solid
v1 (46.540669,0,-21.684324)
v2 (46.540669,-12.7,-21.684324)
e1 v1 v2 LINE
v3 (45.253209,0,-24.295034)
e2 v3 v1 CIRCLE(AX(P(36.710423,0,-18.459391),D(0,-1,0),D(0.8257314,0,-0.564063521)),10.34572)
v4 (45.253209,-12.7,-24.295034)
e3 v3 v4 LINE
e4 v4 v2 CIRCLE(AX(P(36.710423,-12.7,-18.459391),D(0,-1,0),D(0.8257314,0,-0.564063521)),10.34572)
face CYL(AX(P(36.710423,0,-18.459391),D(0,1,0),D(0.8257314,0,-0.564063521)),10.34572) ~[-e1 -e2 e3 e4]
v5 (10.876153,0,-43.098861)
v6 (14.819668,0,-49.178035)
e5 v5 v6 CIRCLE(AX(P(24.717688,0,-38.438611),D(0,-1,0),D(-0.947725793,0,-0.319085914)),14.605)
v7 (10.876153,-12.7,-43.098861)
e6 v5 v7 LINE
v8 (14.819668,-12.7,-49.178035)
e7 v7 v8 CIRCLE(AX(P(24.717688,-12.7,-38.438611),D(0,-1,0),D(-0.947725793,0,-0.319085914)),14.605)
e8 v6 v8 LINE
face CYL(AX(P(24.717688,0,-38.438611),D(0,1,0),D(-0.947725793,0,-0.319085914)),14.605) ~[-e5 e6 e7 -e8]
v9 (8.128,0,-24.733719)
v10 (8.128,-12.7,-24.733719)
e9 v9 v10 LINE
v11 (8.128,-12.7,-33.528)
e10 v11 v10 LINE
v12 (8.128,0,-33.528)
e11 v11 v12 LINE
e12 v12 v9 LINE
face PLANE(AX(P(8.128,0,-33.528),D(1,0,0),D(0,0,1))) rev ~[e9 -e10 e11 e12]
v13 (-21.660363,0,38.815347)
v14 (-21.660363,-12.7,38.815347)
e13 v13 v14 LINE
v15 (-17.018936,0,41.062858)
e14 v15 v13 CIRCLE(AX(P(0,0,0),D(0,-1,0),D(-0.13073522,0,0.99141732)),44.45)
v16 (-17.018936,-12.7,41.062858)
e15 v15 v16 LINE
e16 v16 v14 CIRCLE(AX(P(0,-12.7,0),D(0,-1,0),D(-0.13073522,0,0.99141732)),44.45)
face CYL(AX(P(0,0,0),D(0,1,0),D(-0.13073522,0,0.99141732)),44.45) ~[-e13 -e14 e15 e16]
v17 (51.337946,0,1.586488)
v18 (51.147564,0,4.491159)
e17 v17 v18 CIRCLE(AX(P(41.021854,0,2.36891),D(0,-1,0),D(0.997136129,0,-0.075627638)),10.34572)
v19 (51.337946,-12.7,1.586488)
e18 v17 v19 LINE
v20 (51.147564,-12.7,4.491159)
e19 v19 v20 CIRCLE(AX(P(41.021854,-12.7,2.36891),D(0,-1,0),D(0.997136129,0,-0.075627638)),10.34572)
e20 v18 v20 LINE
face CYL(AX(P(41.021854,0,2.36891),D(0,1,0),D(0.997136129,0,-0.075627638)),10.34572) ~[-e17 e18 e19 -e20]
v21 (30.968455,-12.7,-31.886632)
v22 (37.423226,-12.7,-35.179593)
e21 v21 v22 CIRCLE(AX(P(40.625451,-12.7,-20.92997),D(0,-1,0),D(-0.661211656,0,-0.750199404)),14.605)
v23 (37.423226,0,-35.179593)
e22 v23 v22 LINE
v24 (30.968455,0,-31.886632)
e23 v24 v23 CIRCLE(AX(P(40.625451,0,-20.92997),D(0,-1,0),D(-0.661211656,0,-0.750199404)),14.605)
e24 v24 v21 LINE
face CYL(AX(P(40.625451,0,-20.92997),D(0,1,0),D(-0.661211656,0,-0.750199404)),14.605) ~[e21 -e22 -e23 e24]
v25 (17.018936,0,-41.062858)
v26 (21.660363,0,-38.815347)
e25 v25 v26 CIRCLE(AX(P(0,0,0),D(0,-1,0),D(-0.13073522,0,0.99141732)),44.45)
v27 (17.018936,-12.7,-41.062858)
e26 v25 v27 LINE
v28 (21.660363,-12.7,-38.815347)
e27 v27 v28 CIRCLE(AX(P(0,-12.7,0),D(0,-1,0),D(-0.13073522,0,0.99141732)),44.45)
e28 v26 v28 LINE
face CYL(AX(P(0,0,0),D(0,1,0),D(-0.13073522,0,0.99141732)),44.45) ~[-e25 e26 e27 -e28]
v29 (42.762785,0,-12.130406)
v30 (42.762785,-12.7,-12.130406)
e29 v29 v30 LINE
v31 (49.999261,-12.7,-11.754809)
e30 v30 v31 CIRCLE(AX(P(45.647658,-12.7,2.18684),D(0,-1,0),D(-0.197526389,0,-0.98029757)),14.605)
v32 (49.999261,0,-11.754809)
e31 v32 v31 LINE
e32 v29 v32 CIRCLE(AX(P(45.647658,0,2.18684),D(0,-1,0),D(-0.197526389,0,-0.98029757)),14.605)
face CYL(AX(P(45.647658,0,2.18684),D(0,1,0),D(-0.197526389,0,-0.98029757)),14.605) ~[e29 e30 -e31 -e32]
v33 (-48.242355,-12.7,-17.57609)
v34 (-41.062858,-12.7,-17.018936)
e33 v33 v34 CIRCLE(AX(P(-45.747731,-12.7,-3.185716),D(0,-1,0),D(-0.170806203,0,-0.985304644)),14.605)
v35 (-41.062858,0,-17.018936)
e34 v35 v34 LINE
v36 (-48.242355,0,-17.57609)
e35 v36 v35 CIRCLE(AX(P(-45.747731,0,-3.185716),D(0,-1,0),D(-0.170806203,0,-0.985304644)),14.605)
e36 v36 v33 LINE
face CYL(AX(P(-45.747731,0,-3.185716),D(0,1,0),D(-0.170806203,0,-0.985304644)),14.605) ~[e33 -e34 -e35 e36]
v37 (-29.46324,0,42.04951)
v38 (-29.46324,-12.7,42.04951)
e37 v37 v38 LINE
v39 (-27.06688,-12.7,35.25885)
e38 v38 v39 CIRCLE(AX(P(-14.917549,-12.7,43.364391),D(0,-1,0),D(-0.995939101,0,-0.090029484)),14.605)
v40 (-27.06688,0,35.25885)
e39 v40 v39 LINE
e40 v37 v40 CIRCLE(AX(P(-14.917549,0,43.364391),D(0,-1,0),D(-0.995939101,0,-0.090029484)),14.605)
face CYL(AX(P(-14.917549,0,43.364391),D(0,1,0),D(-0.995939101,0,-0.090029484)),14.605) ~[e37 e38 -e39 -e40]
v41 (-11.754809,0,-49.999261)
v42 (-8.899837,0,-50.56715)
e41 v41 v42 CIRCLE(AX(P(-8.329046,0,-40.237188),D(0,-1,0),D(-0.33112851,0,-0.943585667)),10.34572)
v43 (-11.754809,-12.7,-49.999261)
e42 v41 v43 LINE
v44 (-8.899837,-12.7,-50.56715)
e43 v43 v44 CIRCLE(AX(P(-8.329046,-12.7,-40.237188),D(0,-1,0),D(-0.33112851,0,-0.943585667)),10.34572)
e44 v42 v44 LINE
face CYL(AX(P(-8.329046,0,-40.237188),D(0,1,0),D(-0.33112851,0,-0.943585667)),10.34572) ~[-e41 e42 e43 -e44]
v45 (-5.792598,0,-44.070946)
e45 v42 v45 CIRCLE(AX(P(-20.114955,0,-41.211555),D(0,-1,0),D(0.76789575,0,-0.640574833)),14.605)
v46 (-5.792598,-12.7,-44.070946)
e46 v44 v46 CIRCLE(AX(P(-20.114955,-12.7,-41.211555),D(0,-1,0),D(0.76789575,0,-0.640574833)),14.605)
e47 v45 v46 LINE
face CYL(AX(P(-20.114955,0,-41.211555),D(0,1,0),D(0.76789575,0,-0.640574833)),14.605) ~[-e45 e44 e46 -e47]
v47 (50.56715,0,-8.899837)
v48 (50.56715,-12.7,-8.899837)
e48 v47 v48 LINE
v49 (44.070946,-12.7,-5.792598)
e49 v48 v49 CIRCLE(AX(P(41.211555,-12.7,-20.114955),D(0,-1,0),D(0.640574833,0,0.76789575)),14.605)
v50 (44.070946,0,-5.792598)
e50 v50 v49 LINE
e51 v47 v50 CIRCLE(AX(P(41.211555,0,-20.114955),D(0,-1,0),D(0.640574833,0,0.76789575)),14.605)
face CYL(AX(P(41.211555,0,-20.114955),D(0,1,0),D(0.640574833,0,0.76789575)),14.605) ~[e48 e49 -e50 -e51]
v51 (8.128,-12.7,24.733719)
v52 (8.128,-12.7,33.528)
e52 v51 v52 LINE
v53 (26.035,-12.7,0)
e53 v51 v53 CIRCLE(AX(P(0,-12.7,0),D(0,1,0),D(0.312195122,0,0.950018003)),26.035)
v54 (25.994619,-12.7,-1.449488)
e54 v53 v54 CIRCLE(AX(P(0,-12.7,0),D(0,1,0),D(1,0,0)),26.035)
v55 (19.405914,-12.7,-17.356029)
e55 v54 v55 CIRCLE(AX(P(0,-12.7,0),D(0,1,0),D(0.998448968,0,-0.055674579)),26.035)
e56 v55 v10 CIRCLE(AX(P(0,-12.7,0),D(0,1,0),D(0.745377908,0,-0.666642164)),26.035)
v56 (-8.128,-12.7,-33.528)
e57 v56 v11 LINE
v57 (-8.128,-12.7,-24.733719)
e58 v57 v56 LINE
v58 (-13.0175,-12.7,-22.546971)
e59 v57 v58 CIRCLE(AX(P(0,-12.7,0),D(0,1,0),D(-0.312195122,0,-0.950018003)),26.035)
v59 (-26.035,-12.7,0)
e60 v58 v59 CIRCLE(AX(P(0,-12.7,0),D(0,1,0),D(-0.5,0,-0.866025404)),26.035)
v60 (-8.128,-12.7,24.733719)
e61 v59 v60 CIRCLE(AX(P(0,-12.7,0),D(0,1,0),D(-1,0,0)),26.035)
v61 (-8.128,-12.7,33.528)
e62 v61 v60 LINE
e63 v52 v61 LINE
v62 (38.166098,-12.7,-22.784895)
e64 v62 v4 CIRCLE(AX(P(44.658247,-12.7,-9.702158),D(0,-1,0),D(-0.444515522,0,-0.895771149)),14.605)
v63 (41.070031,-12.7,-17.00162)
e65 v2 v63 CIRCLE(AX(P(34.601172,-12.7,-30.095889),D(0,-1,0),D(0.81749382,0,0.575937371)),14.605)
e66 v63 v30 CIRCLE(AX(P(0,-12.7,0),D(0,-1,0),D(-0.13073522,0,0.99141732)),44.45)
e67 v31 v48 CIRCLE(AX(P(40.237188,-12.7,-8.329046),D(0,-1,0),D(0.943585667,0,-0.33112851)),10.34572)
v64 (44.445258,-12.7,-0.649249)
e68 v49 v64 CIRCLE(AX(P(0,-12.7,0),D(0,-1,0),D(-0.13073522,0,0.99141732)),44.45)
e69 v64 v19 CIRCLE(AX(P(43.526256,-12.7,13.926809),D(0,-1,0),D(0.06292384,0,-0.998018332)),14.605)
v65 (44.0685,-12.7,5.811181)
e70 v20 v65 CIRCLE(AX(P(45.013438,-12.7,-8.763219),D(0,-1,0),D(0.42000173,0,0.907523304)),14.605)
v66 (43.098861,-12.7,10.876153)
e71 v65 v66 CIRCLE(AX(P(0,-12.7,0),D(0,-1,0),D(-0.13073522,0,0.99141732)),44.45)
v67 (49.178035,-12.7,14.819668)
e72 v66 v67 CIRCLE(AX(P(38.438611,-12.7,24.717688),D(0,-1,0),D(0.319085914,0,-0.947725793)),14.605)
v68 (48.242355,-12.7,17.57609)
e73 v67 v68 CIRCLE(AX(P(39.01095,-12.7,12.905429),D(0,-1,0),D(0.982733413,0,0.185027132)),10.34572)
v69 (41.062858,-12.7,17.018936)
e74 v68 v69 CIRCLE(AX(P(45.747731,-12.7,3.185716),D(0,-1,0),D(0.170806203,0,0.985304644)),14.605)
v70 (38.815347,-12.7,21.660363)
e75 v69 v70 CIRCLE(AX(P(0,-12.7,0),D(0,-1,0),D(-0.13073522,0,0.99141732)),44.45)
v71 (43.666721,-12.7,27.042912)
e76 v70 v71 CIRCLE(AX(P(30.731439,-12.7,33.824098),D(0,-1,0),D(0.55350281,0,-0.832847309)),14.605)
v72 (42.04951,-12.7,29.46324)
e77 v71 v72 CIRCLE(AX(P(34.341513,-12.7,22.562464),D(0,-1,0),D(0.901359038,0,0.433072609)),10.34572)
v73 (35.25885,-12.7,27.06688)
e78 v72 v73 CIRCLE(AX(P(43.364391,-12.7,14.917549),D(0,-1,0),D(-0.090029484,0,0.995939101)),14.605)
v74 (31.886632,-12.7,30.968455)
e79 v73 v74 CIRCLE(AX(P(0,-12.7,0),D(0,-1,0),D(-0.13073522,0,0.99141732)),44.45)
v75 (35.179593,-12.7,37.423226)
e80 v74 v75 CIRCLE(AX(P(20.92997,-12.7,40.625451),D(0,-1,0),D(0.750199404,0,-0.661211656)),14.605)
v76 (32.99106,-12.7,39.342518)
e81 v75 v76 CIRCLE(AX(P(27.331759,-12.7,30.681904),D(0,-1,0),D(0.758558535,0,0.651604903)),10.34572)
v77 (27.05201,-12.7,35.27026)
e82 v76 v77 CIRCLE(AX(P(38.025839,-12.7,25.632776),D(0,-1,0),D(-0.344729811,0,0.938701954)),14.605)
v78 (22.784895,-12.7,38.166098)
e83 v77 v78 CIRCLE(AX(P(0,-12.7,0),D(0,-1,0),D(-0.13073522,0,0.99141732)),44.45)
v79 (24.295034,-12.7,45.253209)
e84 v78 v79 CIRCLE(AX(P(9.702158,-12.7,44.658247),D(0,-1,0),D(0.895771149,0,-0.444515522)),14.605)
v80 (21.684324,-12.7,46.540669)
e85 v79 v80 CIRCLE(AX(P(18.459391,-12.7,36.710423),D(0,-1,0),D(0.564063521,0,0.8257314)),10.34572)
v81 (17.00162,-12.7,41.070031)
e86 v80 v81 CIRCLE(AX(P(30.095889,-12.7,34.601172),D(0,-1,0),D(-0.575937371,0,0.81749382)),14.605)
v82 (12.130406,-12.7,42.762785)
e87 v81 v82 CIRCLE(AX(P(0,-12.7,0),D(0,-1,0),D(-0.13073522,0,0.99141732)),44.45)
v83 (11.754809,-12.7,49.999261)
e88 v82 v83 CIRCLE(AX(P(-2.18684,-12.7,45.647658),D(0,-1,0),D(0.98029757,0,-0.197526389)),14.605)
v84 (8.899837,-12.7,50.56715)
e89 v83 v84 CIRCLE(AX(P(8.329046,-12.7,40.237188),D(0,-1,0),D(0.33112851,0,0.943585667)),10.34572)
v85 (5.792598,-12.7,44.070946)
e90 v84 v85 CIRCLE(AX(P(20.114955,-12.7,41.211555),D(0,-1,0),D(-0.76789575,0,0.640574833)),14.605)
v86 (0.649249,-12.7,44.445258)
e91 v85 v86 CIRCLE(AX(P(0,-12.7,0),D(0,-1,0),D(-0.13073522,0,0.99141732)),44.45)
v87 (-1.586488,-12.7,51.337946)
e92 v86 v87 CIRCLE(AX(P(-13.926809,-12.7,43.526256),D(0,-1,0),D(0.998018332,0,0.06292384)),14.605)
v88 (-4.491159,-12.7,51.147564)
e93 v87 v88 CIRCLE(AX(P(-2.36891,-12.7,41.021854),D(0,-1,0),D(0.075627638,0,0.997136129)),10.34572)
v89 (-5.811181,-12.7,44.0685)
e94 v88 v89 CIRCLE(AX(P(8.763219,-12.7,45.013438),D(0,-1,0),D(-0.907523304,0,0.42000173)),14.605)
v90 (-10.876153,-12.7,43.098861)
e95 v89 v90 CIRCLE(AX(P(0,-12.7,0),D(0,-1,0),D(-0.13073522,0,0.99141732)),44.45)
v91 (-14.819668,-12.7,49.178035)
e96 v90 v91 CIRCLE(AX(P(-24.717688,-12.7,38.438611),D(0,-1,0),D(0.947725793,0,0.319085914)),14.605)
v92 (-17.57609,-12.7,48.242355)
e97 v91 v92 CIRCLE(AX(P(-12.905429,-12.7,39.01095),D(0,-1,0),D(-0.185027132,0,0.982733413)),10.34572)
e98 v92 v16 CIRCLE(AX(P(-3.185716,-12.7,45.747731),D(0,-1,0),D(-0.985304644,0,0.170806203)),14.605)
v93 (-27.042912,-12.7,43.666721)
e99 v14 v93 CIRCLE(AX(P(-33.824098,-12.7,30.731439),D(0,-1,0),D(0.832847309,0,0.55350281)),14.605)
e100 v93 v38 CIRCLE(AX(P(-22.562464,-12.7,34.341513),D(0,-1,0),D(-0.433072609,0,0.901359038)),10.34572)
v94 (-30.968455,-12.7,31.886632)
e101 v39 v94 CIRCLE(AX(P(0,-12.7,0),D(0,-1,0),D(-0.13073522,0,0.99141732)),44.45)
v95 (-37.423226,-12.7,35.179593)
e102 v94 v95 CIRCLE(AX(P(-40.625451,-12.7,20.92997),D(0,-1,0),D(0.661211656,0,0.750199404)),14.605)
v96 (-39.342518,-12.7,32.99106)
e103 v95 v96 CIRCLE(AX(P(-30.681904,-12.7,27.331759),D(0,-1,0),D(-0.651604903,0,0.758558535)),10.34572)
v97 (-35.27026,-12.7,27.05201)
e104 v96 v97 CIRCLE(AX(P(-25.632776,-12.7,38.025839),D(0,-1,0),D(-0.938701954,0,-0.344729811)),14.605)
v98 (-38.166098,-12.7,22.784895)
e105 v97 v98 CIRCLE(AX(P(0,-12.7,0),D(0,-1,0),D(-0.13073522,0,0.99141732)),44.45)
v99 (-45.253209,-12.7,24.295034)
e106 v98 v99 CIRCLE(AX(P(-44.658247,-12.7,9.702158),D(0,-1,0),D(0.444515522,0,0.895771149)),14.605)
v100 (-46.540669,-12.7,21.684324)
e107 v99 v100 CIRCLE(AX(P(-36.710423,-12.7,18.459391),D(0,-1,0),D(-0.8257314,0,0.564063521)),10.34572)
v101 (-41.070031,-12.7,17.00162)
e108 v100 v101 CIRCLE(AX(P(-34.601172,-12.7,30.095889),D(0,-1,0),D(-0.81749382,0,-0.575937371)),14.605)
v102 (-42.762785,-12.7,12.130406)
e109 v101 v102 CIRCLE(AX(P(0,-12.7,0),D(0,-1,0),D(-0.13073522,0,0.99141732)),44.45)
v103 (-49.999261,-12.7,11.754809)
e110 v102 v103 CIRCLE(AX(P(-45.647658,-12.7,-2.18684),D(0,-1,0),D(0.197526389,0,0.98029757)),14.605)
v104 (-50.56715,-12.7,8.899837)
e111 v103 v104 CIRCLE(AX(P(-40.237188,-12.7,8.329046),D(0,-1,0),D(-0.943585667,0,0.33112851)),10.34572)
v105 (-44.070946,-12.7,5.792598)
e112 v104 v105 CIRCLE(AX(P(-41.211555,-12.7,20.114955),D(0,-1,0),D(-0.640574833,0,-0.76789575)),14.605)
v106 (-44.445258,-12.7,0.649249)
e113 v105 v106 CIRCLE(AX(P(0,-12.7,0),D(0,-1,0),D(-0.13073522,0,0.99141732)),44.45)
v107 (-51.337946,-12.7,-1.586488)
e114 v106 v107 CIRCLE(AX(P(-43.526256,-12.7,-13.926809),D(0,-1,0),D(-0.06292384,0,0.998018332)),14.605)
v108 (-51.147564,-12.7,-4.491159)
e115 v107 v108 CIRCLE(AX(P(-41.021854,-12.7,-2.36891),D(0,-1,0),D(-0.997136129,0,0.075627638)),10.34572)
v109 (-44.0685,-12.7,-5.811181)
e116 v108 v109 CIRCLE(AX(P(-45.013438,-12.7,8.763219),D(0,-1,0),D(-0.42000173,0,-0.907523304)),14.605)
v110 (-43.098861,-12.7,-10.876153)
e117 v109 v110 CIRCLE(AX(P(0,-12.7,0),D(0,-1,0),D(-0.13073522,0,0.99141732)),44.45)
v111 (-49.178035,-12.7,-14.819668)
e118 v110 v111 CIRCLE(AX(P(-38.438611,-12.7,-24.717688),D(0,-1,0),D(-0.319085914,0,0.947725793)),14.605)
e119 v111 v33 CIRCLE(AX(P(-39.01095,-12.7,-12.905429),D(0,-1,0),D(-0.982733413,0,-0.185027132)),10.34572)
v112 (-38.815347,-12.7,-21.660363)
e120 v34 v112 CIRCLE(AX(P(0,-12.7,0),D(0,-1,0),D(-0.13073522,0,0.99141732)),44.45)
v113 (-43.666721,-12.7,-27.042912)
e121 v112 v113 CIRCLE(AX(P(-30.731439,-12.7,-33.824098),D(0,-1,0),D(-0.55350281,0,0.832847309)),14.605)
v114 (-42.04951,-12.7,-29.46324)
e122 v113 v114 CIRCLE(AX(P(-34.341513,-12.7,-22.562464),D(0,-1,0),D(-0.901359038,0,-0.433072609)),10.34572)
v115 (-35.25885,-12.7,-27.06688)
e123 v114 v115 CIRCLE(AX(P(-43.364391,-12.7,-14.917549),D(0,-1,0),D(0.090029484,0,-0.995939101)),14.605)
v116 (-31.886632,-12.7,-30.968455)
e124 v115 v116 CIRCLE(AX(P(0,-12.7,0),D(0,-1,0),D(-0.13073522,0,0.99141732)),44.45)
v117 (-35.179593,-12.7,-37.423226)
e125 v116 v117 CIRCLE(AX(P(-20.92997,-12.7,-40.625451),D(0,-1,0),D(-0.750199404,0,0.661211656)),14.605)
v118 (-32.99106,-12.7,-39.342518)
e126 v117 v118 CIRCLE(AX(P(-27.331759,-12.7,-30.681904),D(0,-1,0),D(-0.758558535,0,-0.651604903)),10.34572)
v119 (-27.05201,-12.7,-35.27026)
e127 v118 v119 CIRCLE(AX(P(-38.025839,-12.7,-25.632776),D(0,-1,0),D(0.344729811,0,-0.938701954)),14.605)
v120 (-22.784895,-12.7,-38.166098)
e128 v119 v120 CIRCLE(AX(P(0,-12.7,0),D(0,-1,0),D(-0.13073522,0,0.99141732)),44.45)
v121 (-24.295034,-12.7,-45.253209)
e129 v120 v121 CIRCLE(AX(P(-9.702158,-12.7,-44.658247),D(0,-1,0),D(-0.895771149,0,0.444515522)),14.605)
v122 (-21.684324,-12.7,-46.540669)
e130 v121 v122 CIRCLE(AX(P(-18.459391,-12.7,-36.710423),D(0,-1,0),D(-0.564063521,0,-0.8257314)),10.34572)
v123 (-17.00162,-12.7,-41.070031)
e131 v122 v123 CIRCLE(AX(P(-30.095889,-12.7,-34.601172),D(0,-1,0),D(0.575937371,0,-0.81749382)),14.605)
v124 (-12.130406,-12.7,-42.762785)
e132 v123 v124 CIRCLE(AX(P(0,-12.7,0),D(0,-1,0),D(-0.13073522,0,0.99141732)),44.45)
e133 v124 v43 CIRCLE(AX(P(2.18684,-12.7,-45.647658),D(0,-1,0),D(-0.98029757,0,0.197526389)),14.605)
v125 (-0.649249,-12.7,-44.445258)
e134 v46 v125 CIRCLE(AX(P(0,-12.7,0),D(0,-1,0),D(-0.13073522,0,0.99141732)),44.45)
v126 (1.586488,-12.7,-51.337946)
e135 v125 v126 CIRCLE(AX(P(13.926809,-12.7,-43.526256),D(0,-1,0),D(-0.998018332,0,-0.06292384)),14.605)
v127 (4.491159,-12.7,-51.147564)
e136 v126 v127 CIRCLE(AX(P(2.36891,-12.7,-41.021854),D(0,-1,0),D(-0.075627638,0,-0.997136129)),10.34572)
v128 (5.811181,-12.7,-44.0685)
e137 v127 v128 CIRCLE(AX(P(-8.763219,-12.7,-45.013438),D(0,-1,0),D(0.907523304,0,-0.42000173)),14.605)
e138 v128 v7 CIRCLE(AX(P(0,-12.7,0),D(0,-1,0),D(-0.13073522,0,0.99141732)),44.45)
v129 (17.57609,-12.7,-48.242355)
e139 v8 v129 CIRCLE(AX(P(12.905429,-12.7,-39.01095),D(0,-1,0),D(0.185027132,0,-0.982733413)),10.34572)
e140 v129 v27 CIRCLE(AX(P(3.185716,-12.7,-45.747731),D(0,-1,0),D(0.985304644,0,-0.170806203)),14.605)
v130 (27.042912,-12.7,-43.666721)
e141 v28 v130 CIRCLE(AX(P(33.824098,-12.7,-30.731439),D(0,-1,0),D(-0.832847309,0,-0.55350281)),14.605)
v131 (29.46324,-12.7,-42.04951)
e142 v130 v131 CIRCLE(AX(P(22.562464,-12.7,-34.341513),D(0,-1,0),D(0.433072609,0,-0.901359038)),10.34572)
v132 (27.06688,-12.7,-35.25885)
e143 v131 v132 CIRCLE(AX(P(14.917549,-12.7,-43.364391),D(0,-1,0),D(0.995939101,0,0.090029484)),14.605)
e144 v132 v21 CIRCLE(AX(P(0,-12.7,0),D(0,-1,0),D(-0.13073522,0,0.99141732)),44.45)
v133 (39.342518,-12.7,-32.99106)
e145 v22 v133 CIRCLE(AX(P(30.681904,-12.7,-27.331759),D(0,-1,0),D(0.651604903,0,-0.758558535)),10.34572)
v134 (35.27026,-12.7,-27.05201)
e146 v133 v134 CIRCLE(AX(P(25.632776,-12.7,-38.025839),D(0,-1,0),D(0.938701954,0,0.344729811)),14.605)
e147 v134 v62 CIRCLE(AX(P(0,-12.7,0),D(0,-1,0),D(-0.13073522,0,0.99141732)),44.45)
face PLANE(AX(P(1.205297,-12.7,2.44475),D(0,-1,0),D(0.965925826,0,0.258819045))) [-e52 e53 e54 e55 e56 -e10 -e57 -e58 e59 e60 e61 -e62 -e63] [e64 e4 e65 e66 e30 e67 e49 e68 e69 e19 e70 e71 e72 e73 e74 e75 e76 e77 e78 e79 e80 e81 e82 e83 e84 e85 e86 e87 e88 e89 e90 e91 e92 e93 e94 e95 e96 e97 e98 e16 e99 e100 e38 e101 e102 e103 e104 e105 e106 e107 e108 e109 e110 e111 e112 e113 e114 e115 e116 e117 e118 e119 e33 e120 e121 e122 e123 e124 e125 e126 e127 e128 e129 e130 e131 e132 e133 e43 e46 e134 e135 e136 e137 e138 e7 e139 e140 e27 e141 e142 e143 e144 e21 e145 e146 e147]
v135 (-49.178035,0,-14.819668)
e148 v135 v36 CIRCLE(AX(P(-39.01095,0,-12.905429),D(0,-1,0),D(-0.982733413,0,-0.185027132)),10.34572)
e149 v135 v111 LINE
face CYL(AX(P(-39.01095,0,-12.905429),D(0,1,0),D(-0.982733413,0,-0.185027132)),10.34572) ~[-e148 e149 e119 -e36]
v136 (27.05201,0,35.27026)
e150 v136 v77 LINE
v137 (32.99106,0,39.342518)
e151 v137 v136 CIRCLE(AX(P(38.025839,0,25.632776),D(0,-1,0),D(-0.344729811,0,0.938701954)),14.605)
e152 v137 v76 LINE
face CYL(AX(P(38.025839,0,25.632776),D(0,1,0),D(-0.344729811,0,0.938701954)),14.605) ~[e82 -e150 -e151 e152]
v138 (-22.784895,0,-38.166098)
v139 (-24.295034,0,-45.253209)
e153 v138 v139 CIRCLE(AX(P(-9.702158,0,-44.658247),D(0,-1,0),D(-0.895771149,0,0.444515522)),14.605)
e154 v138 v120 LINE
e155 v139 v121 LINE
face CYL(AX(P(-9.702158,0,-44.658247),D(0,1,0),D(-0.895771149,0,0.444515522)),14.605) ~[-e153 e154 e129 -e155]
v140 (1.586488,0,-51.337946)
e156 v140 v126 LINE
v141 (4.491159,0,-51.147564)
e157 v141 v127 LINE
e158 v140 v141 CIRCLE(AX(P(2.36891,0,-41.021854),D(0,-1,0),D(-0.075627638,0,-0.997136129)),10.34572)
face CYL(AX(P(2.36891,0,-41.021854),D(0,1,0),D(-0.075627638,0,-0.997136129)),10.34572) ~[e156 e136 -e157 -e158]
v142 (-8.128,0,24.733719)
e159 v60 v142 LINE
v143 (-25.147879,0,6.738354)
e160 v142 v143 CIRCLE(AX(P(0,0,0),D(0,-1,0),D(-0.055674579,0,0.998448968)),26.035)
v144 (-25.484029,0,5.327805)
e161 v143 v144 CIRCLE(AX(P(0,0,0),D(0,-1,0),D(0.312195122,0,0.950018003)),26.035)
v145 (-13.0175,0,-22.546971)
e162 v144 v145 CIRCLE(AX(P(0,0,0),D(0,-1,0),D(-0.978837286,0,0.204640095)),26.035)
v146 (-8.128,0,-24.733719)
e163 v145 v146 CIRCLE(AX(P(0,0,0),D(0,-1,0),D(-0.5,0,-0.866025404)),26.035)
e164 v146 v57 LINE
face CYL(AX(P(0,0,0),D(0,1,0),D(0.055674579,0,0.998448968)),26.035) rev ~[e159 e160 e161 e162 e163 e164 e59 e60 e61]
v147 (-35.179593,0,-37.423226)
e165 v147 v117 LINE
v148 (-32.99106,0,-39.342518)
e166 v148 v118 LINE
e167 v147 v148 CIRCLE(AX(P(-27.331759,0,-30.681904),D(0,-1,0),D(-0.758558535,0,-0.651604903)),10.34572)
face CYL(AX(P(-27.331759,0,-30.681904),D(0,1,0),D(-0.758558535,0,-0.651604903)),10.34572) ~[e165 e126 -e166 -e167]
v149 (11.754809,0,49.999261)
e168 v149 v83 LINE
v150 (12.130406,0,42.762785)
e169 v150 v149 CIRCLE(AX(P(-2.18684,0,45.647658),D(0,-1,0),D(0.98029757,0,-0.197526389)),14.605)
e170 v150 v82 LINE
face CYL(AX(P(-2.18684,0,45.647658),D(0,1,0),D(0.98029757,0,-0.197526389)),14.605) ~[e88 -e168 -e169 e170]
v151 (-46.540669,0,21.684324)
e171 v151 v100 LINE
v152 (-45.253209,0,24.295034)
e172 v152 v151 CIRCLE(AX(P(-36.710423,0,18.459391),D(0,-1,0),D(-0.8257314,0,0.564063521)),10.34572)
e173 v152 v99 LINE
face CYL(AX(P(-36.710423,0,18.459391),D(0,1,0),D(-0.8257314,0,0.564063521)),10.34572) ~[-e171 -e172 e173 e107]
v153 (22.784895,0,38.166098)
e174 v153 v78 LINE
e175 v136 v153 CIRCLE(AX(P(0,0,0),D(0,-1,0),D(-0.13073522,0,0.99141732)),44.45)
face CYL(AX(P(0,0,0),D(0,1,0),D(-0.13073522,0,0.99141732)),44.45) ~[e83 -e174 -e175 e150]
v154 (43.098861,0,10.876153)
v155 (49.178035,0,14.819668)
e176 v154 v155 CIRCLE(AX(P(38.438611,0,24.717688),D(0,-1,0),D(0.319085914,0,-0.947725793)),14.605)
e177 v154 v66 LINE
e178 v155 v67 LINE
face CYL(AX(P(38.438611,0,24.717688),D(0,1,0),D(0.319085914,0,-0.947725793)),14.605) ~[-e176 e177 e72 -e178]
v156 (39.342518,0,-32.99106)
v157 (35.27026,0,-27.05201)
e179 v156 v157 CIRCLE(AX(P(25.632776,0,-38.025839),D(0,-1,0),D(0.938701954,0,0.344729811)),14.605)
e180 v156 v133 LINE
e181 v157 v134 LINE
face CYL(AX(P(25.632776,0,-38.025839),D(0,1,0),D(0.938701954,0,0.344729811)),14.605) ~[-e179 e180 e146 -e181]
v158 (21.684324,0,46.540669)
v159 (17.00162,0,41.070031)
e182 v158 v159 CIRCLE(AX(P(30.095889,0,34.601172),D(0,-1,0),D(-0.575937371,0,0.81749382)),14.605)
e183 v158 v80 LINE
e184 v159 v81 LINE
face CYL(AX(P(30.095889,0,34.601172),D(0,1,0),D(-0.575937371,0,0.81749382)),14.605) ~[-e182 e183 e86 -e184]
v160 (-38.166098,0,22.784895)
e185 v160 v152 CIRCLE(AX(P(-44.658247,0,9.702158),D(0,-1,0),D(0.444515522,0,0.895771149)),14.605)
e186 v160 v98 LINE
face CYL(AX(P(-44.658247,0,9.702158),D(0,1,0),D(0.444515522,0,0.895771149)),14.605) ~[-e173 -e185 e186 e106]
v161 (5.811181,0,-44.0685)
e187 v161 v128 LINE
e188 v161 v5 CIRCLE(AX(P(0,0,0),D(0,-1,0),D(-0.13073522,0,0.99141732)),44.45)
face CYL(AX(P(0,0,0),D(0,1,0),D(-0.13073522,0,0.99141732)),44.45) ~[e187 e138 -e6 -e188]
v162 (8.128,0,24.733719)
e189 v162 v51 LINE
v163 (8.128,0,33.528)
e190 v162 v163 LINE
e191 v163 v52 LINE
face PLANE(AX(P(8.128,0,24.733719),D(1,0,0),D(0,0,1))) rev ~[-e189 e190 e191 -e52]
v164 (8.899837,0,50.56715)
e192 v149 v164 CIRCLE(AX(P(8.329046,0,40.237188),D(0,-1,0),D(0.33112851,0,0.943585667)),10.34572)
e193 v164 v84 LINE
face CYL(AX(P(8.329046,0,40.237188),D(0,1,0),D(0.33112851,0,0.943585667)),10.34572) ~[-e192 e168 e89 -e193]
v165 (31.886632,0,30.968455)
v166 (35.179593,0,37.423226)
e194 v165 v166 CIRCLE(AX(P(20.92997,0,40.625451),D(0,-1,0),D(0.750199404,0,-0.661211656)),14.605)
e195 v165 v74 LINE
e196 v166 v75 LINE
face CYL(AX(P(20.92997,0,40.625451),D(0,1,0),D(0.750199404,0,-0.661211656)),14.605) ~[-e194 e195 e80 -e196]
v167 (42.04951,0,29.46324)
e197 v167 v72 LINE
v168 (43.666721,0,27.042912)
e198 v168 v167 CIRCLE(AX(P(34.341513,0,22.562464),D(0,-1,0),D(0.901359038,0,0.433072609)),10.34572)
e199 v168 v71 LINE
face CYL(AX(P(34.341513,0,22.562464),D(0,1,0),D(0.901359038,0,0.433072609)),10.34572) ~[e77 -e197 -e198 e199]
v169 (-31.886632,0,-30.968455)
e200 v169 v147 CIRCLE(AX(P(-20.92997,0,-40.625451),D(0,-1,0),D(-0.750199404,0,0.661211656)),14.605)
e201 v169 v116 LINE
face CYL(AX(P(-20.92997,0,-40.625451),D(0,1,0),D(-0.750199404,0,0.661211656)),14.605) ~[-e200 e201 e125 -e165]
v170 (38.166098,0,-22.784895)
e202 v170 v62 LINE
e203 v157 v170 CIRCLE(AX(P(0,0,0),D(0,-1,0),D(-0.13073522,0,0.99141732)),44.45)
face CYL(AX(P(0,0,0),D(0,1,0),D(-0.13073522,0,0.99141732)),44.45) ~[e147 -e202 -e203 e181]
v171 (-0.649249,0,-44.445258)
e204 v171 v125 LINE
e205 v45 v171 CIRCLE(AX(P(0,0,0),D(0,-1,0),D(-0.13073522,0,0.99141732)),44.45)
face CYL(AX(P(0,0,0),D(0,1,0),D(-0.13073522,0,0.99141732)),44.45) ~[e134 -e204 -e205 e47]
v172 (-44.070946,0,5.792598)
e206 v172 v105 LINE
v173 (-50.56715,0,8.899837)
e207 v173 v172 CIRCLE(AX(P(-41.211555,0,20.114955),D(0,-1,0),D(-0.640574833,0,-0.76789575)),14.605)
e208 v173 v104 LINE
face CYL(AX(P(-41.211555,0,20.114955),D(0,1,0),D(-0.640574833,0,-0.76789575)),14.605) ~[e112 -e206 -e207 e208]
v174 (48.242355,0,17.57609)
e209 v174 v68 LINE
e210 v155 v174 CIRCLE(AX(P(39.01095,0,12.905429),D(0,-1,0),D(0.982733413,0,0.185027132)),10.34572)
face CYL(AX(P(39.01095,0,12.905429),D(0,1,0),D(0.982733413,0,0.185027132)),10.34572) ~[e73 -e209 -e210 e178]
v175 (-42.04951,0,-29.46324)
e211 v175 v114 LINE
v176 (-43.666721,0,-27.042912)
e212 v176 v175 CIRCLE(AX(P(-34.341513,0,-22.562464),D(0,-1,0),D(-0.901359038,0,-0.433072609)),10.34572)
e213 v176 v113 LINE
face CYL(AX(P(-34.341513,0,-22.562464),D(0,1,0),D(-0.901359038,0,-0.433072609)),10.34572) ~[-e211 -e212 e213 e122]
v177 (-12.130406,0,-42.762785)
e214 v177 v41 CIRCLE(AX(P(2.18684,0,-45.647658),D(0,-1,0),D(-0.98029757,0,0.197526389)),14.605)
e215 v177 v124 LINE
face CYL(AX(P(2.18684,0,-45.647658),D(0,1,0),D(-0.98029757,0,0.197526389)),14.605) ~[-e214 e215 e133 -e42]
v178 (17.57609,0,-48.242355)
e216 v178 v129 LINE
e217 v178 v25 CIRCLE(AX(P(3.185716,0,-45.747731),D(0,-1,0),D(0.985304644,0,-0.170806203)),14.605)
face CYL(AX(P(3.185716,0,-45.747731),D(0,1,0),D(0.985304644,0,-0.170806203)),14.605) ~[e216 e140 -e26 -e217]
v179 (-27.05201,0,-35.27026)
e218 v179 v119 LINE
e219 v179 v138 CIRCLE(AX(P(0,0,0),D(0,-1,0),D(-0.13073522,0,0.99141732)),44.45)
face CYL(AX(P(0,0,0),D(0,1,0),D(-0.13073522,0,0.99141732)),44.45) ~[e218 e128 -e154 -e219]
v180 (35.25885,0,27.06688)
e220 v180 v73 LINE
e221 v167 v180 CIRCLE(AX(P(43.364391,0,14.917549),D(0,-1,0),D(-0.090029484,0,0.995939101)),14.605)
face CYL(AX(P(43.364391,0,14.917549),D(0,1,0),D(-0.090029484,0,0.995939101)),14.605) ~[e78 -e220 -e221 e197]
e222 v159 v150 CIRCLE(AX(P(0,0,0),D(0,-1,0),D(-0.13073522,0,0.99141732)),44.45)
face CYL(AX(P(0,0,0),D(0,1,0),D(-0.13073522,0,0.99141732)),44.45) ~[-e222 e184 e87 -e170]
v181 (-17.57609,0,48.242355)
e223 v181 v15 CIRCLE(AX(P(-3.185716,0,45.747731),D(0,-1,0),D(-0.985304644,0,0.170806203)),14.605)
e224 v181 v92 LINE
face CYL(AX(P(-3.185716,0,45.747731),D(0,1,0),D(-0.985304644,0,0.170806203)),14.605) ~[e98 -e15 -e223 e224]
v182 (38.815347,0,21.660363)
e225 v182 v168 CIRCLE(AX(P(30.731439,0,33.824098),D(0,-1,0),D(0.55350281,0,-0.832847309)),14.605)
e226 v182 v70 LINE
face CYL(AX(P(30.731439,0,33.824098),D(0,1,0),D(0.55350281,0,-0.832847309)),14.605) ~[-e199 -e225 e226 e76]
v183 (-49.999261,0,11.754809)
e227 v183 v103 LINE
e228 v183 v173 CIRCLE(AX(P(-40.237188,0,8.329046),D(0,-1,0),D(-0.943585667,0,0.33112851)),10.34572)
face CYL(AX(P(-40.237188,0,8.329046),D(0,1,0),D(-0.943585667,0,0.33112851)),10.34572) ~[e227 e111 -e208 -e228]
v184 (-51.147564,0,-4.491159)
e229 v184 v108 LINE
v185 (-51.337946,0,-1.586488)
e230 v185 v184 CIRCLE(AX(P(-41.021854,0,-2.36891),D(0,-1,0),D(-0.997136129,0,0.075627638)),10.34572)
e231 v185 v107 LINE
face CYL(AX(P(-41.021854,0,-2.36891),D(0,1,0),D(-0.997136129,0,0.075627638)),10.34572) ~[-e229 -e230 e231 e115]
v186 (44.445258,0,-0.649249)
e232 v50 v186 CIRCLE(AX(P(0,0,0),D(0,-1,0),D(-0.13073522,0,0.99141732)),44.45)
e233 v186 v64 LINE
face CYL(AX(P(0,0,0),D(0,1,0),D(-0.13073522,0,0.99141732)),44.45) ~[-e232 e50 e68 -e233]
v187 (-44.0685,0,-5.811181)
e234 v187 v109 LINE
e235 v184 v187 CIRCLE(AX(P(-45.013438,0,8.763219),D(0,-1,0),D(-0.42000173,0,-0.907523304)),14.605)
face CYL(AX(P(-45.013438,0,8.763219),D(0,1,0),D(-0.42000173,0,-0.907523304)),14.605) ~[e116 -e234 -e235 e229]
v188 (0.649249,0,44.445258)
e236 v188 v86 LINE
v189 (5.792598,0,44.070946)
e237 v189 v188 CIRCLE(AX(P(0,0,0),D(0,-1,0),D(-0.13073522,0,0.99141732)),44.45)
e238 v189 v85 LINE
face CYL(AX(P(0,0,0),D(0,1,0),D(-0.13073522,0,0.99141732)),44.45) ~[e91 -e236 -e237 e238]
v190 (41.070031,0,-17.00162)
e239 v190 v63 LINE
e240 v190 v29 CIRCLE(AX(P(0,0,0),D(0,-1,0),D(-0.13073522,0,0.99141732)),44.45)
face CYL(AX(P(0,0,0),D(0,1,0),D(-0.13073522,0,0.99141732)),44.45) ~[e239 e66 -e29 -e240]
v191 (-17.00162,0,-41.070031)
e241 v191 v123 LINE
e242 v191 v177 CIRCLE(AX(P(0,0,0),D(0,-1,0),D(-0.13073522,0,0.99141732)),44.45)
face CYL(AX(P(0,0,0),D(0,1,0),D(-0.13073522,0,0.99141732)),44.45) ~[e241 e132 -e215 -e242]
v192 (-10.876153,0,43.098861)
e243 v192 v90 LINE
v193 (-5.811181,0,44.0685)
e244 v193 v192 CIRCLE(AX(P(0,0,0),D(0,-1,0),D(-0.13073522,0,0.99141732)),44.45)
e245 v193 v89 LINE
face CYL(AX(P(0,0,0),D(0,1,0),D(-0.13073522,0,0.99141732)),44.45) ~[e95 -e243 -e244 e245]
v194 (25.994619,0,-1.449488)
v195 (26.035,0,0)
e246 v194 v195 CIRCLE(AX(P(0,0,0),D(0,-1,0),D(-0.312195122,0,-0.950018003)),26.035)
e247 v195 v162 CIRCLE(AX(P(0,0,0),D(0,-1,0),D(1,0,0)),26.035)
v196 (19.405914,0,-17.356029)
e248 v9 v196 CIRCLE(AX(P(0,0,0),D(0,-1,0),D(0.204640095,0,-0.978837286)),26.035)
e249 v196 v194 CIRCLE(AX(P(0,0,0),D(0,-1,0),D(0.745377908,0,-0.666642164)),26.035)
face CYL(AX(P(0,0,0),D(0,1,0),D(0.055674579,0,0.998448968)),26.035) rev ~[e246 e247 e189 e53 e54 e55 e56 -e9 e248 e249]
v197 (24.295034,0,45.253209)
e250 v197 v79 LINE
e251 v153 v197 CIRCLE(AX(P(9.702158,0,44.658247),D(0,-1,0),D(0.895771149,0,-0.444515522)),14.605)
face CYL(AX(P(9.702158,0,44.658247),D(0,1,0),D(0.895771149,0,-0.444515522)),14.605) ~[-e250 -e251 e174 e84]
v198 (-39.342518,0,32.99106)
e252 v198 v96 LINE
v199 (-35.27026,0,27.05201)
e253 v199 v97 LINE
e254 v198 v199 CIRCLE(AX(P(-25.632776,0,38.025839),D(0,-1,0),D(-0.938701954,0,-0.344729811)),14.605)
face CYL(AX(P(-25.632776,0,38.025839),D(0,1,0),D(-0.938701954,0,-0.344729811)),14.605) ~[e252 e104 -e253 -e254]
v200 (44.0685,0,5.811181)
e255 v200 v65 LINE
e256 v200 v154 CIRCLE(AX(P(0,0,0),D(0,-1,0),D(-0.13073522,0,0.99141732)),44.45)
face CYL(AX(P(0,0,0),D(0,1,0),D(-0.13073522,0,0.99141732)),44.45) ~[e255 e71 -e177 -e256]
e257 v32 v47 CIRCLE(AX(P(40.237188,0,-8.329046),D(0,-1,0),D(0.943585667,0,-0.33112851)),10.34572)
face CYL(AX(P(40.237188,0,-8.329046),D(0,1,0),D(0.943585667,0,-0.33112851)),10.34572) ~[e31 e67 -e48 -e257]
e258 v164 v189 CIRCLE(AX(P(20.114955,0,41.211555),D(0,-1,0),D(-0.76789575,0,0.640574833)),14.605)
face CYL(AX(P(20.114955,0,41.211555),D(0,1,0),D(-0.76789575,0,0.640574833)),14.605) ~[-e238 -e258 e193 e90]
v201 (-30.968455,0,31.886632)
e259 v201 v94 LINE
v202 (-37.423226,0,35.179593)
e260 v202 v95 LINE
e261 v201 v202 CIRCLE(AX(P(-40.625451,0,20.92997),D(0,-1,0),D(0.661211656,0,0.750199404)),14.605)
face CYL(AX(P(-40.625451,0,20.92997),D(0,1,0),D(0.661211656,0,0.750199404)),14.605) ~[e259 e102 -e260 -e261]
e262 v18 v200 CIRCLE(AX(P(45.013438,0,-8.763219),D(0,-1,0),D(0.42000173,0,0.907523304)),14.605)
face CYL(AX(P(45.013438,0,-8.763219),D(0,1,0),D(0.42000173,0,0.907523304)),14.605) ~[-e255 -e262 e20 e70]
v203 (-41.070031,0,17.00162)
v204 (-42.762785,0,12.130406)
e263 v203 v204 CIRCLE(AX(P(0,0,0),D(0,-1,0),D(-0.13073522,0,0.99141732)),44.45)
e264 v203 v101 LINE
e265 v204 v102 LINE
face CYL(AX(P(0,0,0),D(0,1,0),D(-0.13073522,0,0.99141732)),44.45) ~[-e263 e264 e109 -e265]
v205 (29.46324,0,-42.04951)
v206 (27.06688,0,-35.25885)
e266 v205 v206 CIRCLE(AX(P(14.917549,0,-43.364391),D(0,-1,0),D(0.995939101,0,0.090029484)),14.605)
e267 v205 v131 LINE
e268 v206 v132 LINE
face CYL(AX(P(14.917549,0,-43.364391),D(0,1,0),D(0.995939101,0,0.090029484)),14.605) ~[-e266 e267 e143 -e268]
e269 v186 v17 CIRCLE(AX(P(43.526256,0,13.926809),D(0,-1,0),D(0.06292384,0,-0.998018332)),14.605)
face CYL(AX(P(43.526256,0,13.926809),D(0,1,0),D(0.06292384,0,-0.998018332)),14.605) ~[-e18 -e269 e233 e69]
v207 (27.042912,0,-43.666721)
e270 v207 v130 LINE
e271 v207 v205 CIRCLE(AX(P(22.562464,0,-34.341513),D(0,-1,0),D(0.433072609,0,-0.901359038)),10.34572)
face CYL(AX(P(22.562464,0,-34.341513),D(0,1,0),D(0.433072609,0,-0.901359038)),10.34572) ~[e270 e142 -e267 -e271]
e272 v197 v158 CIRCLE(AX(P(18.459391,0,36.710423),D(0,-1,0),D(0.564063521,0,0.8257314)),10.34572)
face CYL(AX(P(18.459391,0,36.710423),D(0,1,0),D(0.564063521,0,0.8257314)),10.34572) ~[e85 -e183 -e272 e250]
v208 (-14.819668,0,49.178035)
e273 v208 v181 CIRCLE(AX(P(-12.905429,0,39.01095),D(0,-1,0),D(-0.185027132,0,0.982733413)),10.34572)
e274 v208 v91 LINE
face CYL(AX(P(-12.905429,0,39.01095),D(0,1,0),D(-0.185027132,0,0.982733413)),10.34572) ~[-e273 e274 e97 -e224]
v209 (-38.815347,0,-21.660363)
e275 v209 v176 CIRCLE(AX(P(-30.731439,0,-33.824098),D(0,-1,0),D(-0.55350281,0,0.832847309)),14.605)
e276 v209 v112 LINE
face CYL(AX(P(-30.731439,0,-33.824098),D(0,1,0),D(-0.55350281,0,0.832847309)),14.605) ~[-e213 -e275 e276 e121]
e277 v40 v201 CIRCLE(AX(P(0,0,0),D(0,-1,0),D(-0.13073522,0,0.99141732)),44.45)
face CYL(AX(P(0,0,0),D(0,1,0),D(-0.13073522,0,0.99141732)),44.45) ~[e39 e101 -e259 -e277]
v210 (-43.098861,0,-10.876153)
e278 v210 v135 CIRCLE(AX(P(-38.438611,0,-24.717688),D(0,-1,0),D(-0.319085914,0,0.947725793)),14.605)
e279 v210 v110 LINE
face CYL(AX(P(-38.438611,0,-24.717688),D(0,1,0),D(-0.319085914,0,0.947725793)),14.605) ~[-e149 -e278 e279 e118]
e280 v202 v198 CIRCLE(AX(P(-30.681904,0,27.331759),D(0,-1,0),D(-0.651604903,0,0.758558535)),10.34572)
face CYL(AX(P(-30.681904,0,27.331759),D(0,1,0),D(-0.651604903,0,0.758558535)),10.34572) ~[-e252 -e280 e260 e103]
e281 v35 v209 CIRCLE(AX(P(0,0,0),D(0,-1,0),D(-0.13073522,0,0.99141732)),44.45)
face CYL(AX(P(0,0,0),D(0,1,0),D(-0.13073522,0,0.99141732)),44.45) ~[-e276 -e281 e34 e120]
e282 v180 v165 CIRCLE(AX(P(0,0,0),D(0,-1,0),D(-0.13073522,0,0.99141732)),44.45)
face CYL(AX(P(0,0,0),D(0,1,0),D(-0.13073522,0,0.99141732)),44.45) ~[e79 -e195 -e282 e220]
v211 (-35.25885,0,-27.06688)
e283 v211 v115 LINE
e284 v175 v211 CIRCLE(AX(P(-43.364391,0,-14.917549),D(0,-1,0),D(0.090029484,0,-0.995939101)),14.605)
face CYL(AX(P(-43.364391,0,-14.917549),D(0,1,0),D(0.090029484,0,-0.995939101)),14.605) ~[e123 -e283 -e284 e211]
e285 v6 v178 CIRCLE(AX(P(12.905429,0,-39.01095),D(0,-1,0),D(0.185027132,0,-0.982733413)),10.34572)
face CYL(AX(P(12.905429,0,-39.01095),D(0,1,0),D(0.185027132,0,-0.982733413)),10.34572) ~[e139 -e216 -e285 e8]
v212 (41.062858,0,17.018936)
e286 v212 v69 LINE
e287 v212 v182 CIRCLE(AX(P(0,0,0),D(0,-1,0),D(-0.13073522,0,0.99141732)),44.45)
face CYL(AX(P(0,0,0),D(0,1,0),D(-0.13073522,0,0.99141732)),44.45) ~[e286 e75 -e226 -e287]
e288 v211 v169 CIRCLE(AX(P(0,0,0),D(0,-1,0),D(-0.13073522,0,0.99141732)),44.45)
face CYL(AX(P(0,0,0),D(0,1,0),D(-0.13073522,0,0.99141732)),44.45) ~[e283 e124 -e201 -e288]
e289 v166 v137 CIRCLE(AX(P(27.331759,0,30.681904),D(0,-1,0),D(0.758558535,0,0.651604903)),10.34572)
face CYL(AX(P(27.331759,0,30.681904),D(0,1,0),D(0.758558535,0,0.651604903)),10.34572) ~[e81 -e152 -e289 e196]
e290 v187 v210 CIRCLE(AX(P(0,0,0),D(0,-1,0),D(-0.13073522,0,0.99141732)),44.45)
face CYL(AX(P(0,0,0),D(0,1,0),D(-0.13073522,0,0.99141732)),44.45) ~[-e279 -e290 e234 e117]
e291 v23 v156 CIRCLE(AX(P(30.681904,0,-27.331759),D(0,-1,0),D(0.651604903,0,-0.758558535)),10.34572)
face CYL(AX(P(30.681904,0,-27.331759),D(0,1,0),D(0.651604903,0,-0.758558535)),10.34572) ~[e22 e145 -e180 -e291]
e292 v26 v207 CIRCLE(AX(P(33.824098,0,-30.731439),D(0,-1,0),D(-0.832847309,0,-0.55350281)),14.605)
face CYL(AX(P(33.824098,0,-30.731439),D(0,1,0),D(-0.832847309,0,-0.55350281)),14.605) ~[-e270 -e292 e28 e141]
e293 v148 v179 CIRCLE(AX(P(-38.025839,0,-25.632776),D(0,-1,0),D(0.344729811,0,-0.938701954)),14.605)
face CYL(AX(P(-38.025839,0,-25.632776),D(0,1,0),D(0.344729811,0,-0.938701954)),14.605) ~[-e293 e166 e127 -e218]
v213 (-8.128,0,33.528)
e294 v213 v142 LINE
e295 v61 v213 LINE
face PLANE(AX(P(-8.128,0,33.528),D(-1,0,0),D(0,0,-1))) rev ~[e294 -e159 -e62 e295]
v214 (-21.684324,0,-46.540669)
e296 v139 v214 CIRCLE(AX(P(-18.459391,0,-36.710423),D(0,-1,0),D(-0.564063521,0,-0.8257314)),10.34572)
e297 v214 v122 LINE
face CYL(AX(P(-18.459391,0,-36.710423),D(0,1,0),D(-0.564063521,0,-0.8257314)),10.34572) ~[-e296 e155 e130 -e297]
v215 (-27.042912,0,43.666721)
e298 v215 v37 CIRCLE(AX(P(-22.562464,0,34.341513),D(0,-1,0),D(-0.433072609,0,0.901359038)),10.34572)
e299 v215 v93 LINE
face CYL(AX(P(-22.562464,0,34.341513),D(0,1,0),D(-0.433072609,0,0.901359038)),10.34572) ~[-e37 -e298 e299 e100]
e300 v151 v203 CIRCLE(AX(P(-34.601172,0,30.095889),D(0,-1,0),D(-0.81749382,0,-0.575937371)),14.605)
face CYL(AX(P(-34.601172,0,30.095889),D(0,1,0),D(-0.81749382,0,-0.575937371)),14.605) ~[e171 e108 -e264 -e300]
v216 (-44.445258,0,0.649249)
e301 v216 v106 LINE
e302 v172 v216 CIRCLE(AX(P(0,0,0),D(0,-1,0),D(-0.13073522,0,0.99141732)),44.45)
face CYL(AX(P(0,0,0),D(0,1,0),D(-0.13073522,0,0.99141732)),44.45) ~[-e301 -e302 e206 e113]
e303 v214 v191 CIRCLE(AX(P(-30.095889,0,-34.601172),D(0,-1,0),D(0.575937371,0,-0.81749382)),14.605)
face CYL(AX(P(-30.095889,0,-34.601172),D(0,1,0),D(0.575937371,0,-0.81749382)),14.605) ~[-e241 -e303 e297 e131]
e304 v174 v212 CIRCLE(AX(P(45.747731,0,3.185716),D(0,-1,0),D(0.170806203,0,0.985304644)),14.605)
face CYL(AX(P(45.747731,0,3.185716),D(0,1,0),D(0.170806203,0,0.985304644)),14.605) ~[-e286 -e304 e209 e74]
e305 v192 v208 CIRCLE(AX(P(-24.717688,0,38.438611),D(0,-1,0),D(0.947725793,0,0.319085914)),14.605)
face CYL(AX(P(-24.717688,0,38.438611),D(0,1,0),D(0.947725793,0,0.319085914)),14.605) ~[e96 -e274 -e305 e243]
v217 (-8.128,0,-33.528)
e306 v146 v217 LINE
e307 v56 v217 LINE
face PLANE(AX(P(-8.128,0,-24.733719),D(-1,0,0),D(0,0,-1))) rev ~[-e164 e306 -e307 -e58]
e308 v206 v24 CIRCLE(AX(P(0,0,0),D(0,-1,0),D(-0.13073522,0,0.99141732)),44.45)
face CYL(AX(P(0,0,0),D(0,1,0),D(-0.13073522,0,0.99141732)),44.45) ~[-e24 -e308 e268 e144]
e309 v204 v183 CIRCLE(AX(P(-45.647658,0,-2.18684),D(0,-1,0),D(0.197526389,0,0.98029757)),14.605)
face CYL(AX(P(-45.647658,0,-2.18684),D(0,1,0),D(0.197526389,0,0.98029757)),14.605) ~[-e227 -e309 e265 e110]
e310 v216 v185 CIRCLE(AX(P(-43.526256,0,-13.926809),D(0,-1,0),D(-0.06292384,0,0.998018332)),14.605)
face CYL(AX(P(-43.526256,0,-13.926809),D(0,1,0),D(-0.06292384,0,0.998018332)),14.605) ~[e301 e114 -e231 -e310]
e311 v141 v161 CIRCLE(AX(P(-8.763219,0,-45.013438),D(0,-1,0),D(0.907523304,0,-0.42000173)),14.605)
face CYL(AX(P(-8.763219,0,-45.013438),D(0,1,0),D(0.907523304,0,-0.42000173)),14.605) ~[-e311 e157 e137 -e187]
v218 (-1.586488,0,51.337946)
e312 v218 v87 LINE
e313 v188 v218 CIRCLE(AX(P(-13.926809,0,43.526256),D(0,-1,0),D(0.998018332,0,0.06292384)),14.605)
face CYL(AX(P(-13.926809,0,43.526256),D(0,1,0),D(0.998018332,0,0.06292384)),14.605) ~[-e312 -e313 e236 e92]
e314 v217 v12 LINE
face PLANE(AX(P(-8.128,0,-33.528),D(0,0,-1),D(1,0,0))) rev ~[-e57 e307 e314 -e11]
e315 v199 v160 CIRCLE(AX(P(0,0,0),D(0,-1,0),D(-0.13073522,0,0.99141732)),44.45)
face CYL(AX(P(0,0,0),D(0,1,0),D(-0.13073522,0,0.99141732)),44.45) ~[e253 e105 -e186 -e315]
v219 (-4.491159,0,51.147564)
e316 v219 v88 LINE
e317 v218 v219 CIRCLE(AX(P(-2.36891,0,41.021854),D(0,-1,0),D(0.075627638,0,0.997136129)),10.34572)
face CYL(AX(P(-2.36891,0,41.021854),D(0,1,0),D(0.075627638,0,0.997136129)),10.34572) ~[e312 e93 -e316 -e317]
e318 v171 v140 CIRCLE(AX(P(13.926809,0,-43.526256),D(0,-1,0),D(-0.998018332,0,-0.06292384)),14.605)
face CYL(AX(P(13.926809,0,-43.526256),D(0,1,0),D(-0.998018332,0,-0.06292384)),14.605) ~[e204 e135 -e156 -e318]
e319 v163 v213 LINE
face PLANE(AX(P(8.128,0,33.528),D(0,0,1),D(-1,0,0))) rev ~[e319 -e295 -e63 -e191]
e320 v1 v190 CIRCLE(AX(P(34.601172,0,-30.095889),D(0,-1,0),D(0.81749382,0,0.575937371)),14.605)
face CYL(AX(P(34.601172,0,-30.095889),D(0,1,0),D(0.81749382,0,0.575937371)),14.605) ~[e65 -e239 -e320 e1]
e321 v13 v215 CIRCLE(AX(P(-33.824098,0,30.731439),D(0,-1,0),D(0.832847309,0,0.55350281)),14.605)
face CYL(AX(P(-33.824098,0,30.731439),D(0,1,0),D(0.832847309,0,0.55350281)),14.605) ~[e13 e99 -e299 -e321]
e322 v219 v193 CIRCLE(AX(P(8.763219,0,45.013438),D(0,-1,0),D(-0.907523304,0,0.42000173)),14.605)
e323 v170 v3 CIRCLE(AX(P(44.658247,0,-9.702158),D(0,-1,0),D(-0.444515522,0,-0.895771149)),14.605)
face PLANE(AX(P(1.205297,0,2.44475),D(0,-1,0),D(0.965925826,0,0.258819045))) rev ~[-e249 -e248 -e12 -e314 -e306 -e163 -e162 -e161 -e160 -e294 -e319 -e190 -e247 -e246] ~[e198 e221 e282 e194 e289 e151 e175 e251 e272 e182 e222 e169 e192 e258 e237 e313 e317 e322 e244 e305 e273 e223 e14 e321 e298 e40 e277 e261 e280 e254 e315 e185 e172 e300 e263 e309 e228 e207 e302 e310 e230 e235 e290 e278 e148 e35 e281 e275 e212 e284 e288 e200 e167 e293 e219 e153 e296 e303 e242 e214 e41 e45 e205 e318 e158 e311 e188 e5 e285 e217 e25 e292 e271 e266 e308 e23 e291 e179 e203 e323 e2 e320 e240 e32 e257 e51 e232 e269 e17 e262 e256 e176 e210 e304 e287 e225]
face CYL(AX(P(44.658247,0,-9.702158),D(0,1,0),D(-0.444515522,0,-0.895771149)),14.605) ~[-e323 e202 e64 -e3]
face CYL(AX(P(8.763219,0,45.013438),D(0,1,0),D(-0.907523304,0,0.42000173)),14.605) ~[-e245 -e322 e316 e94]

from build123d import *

# Parameters (mm, degrees)
F1_DEPTH = 12.7
F2_COUNT = 24
F2_ANGLE = 345
F3_DEPTH = 25.4


# Not quite as in the source:
# - a feature names something its author has since deleted; it is built from what else it names


with BuildPart() as f1:
    # F0 (on Front) → F1 (new body)
    with BuildSketch(Plane.XZ):
        with BuildLine():
            ThreePointArc((-5.81118052, 44.0684998719), (-29.3043983549, -33.4223688128), (44.45, 0))
            ThreePointArc((44.45, 0), (31.6596085179, 31.2005078243), (0.6492491116, 44.4452581902))
            ThreePointArc((0.6492491116, 44.4452581902), (-2.5878312685, 44.3746056808), (-5.81118052, 44.0684998719))
        make_face()
        with BuildLine():
            ThreePointArc((8.128, 24.7337187054), (21.0883108024, 15.2677559746), (26.035, 0))
            ThreePointArc((26.035, 0), (21.0883108024, -15.2677559746), (8.128, -24.7337187054))
            Line((8.128, -24.7337187054), (8.128, -33.528))
            Line((8.128, -33.528), (-8.128, -33.528))
            Line((-8.128, -33.528), (-8.128, -24.7337187054))
            ThreePointArc((-8.128, -24.7337187054), (-26.035, 0), (-8.128, 24.7337187054))
            Line((-8.128, 24.7337187054), (-8.128, 33.528))
            Line((-8.128, 33.528), (8.128, 33.528))
            Line((8.128, 33.528), (8.128, 24.7337187054))
        make_face(mode=Mode.SUBTRACT)
        with BuildLine():
            ThreePointArc((-5.81118052, 44.0684998719), (-2.5878312685, 44.3746056808), (0.6492491116, 44.4452581902))
            ThreePointArc((0.6492491116, 44.4452581902), (-0.0343594341, 48.0324601777), (-1.5864878253, 51.3379459514))
            ThreePointArc((-1.5864878253, 51.3379459514), (-3.0455527066, 51.3454237754), (-4.4911590337, 51.147563742))
            ThreePointArc((-4.4911590337, 51.147563742), (-5.5943052126, 47.6906625485), (-5.81118052, 44.0684998719))
        make_face()
    extrude(amount=F1_DEPTH)

    # F2: F1 ×24 about axis
    f2_axis = Axis((0, 0, 0), (0, 1, 0))


with BuildPart() as f1_1:
    add(f1.part)
    for i in range(1, F2_COUNT):
        add(f1.part.rotate(f2_axis, i * F2_ANGLE / (F2_COUNT - 1)))


with BuildPart() as f3:
    # F0 (on Front) → F3 (new body, symmetric)
    with BuildSketch(Plane.XZ):
        with BuildLine():
            ThreePointArc((-8.128, 24.7337187054), (0, 26.035), (8.128, 24.7337187054))
            Line((8.128, 24.7337187054), (8.128, 33.528))
            Line((8.128, 33.528), (-8.128, 33.528))
            Line((-8.128, 33.528), (-8.128, 24.7337187054))
        make_face()
    extrude(amount=F3_DEPTH, both=True)


with BuildPart() as f3b:
    # F0 (on Front) → F3, piece 2 (new body, symmetric)
    with BuildSketch(Plane.XZ):
        with BuildLine():
            Line((8.128, -33.528), (8.128, -24.7337187054))
            ThreePointArc((8.128, -24.7337187054), (0, -26.035), (-8.128, -24.7337187054))
            Line((-8.128, -24.7337187054), (-8.128, -33.528))
            Line((-8.128, -33.528), (8.128, -33.528))
        make_face()
    extrude(amount=F3_DEPTH, both=True)


with BuildPart() as f1_2:
    add(f1_1.part)

    # F4: cut F3, F3b
    add(f3.part, mode=Mode.SUBTRACT)
    add(f3b.part, mode=Mode.SUBTRACT)


solid = f1_2.part
